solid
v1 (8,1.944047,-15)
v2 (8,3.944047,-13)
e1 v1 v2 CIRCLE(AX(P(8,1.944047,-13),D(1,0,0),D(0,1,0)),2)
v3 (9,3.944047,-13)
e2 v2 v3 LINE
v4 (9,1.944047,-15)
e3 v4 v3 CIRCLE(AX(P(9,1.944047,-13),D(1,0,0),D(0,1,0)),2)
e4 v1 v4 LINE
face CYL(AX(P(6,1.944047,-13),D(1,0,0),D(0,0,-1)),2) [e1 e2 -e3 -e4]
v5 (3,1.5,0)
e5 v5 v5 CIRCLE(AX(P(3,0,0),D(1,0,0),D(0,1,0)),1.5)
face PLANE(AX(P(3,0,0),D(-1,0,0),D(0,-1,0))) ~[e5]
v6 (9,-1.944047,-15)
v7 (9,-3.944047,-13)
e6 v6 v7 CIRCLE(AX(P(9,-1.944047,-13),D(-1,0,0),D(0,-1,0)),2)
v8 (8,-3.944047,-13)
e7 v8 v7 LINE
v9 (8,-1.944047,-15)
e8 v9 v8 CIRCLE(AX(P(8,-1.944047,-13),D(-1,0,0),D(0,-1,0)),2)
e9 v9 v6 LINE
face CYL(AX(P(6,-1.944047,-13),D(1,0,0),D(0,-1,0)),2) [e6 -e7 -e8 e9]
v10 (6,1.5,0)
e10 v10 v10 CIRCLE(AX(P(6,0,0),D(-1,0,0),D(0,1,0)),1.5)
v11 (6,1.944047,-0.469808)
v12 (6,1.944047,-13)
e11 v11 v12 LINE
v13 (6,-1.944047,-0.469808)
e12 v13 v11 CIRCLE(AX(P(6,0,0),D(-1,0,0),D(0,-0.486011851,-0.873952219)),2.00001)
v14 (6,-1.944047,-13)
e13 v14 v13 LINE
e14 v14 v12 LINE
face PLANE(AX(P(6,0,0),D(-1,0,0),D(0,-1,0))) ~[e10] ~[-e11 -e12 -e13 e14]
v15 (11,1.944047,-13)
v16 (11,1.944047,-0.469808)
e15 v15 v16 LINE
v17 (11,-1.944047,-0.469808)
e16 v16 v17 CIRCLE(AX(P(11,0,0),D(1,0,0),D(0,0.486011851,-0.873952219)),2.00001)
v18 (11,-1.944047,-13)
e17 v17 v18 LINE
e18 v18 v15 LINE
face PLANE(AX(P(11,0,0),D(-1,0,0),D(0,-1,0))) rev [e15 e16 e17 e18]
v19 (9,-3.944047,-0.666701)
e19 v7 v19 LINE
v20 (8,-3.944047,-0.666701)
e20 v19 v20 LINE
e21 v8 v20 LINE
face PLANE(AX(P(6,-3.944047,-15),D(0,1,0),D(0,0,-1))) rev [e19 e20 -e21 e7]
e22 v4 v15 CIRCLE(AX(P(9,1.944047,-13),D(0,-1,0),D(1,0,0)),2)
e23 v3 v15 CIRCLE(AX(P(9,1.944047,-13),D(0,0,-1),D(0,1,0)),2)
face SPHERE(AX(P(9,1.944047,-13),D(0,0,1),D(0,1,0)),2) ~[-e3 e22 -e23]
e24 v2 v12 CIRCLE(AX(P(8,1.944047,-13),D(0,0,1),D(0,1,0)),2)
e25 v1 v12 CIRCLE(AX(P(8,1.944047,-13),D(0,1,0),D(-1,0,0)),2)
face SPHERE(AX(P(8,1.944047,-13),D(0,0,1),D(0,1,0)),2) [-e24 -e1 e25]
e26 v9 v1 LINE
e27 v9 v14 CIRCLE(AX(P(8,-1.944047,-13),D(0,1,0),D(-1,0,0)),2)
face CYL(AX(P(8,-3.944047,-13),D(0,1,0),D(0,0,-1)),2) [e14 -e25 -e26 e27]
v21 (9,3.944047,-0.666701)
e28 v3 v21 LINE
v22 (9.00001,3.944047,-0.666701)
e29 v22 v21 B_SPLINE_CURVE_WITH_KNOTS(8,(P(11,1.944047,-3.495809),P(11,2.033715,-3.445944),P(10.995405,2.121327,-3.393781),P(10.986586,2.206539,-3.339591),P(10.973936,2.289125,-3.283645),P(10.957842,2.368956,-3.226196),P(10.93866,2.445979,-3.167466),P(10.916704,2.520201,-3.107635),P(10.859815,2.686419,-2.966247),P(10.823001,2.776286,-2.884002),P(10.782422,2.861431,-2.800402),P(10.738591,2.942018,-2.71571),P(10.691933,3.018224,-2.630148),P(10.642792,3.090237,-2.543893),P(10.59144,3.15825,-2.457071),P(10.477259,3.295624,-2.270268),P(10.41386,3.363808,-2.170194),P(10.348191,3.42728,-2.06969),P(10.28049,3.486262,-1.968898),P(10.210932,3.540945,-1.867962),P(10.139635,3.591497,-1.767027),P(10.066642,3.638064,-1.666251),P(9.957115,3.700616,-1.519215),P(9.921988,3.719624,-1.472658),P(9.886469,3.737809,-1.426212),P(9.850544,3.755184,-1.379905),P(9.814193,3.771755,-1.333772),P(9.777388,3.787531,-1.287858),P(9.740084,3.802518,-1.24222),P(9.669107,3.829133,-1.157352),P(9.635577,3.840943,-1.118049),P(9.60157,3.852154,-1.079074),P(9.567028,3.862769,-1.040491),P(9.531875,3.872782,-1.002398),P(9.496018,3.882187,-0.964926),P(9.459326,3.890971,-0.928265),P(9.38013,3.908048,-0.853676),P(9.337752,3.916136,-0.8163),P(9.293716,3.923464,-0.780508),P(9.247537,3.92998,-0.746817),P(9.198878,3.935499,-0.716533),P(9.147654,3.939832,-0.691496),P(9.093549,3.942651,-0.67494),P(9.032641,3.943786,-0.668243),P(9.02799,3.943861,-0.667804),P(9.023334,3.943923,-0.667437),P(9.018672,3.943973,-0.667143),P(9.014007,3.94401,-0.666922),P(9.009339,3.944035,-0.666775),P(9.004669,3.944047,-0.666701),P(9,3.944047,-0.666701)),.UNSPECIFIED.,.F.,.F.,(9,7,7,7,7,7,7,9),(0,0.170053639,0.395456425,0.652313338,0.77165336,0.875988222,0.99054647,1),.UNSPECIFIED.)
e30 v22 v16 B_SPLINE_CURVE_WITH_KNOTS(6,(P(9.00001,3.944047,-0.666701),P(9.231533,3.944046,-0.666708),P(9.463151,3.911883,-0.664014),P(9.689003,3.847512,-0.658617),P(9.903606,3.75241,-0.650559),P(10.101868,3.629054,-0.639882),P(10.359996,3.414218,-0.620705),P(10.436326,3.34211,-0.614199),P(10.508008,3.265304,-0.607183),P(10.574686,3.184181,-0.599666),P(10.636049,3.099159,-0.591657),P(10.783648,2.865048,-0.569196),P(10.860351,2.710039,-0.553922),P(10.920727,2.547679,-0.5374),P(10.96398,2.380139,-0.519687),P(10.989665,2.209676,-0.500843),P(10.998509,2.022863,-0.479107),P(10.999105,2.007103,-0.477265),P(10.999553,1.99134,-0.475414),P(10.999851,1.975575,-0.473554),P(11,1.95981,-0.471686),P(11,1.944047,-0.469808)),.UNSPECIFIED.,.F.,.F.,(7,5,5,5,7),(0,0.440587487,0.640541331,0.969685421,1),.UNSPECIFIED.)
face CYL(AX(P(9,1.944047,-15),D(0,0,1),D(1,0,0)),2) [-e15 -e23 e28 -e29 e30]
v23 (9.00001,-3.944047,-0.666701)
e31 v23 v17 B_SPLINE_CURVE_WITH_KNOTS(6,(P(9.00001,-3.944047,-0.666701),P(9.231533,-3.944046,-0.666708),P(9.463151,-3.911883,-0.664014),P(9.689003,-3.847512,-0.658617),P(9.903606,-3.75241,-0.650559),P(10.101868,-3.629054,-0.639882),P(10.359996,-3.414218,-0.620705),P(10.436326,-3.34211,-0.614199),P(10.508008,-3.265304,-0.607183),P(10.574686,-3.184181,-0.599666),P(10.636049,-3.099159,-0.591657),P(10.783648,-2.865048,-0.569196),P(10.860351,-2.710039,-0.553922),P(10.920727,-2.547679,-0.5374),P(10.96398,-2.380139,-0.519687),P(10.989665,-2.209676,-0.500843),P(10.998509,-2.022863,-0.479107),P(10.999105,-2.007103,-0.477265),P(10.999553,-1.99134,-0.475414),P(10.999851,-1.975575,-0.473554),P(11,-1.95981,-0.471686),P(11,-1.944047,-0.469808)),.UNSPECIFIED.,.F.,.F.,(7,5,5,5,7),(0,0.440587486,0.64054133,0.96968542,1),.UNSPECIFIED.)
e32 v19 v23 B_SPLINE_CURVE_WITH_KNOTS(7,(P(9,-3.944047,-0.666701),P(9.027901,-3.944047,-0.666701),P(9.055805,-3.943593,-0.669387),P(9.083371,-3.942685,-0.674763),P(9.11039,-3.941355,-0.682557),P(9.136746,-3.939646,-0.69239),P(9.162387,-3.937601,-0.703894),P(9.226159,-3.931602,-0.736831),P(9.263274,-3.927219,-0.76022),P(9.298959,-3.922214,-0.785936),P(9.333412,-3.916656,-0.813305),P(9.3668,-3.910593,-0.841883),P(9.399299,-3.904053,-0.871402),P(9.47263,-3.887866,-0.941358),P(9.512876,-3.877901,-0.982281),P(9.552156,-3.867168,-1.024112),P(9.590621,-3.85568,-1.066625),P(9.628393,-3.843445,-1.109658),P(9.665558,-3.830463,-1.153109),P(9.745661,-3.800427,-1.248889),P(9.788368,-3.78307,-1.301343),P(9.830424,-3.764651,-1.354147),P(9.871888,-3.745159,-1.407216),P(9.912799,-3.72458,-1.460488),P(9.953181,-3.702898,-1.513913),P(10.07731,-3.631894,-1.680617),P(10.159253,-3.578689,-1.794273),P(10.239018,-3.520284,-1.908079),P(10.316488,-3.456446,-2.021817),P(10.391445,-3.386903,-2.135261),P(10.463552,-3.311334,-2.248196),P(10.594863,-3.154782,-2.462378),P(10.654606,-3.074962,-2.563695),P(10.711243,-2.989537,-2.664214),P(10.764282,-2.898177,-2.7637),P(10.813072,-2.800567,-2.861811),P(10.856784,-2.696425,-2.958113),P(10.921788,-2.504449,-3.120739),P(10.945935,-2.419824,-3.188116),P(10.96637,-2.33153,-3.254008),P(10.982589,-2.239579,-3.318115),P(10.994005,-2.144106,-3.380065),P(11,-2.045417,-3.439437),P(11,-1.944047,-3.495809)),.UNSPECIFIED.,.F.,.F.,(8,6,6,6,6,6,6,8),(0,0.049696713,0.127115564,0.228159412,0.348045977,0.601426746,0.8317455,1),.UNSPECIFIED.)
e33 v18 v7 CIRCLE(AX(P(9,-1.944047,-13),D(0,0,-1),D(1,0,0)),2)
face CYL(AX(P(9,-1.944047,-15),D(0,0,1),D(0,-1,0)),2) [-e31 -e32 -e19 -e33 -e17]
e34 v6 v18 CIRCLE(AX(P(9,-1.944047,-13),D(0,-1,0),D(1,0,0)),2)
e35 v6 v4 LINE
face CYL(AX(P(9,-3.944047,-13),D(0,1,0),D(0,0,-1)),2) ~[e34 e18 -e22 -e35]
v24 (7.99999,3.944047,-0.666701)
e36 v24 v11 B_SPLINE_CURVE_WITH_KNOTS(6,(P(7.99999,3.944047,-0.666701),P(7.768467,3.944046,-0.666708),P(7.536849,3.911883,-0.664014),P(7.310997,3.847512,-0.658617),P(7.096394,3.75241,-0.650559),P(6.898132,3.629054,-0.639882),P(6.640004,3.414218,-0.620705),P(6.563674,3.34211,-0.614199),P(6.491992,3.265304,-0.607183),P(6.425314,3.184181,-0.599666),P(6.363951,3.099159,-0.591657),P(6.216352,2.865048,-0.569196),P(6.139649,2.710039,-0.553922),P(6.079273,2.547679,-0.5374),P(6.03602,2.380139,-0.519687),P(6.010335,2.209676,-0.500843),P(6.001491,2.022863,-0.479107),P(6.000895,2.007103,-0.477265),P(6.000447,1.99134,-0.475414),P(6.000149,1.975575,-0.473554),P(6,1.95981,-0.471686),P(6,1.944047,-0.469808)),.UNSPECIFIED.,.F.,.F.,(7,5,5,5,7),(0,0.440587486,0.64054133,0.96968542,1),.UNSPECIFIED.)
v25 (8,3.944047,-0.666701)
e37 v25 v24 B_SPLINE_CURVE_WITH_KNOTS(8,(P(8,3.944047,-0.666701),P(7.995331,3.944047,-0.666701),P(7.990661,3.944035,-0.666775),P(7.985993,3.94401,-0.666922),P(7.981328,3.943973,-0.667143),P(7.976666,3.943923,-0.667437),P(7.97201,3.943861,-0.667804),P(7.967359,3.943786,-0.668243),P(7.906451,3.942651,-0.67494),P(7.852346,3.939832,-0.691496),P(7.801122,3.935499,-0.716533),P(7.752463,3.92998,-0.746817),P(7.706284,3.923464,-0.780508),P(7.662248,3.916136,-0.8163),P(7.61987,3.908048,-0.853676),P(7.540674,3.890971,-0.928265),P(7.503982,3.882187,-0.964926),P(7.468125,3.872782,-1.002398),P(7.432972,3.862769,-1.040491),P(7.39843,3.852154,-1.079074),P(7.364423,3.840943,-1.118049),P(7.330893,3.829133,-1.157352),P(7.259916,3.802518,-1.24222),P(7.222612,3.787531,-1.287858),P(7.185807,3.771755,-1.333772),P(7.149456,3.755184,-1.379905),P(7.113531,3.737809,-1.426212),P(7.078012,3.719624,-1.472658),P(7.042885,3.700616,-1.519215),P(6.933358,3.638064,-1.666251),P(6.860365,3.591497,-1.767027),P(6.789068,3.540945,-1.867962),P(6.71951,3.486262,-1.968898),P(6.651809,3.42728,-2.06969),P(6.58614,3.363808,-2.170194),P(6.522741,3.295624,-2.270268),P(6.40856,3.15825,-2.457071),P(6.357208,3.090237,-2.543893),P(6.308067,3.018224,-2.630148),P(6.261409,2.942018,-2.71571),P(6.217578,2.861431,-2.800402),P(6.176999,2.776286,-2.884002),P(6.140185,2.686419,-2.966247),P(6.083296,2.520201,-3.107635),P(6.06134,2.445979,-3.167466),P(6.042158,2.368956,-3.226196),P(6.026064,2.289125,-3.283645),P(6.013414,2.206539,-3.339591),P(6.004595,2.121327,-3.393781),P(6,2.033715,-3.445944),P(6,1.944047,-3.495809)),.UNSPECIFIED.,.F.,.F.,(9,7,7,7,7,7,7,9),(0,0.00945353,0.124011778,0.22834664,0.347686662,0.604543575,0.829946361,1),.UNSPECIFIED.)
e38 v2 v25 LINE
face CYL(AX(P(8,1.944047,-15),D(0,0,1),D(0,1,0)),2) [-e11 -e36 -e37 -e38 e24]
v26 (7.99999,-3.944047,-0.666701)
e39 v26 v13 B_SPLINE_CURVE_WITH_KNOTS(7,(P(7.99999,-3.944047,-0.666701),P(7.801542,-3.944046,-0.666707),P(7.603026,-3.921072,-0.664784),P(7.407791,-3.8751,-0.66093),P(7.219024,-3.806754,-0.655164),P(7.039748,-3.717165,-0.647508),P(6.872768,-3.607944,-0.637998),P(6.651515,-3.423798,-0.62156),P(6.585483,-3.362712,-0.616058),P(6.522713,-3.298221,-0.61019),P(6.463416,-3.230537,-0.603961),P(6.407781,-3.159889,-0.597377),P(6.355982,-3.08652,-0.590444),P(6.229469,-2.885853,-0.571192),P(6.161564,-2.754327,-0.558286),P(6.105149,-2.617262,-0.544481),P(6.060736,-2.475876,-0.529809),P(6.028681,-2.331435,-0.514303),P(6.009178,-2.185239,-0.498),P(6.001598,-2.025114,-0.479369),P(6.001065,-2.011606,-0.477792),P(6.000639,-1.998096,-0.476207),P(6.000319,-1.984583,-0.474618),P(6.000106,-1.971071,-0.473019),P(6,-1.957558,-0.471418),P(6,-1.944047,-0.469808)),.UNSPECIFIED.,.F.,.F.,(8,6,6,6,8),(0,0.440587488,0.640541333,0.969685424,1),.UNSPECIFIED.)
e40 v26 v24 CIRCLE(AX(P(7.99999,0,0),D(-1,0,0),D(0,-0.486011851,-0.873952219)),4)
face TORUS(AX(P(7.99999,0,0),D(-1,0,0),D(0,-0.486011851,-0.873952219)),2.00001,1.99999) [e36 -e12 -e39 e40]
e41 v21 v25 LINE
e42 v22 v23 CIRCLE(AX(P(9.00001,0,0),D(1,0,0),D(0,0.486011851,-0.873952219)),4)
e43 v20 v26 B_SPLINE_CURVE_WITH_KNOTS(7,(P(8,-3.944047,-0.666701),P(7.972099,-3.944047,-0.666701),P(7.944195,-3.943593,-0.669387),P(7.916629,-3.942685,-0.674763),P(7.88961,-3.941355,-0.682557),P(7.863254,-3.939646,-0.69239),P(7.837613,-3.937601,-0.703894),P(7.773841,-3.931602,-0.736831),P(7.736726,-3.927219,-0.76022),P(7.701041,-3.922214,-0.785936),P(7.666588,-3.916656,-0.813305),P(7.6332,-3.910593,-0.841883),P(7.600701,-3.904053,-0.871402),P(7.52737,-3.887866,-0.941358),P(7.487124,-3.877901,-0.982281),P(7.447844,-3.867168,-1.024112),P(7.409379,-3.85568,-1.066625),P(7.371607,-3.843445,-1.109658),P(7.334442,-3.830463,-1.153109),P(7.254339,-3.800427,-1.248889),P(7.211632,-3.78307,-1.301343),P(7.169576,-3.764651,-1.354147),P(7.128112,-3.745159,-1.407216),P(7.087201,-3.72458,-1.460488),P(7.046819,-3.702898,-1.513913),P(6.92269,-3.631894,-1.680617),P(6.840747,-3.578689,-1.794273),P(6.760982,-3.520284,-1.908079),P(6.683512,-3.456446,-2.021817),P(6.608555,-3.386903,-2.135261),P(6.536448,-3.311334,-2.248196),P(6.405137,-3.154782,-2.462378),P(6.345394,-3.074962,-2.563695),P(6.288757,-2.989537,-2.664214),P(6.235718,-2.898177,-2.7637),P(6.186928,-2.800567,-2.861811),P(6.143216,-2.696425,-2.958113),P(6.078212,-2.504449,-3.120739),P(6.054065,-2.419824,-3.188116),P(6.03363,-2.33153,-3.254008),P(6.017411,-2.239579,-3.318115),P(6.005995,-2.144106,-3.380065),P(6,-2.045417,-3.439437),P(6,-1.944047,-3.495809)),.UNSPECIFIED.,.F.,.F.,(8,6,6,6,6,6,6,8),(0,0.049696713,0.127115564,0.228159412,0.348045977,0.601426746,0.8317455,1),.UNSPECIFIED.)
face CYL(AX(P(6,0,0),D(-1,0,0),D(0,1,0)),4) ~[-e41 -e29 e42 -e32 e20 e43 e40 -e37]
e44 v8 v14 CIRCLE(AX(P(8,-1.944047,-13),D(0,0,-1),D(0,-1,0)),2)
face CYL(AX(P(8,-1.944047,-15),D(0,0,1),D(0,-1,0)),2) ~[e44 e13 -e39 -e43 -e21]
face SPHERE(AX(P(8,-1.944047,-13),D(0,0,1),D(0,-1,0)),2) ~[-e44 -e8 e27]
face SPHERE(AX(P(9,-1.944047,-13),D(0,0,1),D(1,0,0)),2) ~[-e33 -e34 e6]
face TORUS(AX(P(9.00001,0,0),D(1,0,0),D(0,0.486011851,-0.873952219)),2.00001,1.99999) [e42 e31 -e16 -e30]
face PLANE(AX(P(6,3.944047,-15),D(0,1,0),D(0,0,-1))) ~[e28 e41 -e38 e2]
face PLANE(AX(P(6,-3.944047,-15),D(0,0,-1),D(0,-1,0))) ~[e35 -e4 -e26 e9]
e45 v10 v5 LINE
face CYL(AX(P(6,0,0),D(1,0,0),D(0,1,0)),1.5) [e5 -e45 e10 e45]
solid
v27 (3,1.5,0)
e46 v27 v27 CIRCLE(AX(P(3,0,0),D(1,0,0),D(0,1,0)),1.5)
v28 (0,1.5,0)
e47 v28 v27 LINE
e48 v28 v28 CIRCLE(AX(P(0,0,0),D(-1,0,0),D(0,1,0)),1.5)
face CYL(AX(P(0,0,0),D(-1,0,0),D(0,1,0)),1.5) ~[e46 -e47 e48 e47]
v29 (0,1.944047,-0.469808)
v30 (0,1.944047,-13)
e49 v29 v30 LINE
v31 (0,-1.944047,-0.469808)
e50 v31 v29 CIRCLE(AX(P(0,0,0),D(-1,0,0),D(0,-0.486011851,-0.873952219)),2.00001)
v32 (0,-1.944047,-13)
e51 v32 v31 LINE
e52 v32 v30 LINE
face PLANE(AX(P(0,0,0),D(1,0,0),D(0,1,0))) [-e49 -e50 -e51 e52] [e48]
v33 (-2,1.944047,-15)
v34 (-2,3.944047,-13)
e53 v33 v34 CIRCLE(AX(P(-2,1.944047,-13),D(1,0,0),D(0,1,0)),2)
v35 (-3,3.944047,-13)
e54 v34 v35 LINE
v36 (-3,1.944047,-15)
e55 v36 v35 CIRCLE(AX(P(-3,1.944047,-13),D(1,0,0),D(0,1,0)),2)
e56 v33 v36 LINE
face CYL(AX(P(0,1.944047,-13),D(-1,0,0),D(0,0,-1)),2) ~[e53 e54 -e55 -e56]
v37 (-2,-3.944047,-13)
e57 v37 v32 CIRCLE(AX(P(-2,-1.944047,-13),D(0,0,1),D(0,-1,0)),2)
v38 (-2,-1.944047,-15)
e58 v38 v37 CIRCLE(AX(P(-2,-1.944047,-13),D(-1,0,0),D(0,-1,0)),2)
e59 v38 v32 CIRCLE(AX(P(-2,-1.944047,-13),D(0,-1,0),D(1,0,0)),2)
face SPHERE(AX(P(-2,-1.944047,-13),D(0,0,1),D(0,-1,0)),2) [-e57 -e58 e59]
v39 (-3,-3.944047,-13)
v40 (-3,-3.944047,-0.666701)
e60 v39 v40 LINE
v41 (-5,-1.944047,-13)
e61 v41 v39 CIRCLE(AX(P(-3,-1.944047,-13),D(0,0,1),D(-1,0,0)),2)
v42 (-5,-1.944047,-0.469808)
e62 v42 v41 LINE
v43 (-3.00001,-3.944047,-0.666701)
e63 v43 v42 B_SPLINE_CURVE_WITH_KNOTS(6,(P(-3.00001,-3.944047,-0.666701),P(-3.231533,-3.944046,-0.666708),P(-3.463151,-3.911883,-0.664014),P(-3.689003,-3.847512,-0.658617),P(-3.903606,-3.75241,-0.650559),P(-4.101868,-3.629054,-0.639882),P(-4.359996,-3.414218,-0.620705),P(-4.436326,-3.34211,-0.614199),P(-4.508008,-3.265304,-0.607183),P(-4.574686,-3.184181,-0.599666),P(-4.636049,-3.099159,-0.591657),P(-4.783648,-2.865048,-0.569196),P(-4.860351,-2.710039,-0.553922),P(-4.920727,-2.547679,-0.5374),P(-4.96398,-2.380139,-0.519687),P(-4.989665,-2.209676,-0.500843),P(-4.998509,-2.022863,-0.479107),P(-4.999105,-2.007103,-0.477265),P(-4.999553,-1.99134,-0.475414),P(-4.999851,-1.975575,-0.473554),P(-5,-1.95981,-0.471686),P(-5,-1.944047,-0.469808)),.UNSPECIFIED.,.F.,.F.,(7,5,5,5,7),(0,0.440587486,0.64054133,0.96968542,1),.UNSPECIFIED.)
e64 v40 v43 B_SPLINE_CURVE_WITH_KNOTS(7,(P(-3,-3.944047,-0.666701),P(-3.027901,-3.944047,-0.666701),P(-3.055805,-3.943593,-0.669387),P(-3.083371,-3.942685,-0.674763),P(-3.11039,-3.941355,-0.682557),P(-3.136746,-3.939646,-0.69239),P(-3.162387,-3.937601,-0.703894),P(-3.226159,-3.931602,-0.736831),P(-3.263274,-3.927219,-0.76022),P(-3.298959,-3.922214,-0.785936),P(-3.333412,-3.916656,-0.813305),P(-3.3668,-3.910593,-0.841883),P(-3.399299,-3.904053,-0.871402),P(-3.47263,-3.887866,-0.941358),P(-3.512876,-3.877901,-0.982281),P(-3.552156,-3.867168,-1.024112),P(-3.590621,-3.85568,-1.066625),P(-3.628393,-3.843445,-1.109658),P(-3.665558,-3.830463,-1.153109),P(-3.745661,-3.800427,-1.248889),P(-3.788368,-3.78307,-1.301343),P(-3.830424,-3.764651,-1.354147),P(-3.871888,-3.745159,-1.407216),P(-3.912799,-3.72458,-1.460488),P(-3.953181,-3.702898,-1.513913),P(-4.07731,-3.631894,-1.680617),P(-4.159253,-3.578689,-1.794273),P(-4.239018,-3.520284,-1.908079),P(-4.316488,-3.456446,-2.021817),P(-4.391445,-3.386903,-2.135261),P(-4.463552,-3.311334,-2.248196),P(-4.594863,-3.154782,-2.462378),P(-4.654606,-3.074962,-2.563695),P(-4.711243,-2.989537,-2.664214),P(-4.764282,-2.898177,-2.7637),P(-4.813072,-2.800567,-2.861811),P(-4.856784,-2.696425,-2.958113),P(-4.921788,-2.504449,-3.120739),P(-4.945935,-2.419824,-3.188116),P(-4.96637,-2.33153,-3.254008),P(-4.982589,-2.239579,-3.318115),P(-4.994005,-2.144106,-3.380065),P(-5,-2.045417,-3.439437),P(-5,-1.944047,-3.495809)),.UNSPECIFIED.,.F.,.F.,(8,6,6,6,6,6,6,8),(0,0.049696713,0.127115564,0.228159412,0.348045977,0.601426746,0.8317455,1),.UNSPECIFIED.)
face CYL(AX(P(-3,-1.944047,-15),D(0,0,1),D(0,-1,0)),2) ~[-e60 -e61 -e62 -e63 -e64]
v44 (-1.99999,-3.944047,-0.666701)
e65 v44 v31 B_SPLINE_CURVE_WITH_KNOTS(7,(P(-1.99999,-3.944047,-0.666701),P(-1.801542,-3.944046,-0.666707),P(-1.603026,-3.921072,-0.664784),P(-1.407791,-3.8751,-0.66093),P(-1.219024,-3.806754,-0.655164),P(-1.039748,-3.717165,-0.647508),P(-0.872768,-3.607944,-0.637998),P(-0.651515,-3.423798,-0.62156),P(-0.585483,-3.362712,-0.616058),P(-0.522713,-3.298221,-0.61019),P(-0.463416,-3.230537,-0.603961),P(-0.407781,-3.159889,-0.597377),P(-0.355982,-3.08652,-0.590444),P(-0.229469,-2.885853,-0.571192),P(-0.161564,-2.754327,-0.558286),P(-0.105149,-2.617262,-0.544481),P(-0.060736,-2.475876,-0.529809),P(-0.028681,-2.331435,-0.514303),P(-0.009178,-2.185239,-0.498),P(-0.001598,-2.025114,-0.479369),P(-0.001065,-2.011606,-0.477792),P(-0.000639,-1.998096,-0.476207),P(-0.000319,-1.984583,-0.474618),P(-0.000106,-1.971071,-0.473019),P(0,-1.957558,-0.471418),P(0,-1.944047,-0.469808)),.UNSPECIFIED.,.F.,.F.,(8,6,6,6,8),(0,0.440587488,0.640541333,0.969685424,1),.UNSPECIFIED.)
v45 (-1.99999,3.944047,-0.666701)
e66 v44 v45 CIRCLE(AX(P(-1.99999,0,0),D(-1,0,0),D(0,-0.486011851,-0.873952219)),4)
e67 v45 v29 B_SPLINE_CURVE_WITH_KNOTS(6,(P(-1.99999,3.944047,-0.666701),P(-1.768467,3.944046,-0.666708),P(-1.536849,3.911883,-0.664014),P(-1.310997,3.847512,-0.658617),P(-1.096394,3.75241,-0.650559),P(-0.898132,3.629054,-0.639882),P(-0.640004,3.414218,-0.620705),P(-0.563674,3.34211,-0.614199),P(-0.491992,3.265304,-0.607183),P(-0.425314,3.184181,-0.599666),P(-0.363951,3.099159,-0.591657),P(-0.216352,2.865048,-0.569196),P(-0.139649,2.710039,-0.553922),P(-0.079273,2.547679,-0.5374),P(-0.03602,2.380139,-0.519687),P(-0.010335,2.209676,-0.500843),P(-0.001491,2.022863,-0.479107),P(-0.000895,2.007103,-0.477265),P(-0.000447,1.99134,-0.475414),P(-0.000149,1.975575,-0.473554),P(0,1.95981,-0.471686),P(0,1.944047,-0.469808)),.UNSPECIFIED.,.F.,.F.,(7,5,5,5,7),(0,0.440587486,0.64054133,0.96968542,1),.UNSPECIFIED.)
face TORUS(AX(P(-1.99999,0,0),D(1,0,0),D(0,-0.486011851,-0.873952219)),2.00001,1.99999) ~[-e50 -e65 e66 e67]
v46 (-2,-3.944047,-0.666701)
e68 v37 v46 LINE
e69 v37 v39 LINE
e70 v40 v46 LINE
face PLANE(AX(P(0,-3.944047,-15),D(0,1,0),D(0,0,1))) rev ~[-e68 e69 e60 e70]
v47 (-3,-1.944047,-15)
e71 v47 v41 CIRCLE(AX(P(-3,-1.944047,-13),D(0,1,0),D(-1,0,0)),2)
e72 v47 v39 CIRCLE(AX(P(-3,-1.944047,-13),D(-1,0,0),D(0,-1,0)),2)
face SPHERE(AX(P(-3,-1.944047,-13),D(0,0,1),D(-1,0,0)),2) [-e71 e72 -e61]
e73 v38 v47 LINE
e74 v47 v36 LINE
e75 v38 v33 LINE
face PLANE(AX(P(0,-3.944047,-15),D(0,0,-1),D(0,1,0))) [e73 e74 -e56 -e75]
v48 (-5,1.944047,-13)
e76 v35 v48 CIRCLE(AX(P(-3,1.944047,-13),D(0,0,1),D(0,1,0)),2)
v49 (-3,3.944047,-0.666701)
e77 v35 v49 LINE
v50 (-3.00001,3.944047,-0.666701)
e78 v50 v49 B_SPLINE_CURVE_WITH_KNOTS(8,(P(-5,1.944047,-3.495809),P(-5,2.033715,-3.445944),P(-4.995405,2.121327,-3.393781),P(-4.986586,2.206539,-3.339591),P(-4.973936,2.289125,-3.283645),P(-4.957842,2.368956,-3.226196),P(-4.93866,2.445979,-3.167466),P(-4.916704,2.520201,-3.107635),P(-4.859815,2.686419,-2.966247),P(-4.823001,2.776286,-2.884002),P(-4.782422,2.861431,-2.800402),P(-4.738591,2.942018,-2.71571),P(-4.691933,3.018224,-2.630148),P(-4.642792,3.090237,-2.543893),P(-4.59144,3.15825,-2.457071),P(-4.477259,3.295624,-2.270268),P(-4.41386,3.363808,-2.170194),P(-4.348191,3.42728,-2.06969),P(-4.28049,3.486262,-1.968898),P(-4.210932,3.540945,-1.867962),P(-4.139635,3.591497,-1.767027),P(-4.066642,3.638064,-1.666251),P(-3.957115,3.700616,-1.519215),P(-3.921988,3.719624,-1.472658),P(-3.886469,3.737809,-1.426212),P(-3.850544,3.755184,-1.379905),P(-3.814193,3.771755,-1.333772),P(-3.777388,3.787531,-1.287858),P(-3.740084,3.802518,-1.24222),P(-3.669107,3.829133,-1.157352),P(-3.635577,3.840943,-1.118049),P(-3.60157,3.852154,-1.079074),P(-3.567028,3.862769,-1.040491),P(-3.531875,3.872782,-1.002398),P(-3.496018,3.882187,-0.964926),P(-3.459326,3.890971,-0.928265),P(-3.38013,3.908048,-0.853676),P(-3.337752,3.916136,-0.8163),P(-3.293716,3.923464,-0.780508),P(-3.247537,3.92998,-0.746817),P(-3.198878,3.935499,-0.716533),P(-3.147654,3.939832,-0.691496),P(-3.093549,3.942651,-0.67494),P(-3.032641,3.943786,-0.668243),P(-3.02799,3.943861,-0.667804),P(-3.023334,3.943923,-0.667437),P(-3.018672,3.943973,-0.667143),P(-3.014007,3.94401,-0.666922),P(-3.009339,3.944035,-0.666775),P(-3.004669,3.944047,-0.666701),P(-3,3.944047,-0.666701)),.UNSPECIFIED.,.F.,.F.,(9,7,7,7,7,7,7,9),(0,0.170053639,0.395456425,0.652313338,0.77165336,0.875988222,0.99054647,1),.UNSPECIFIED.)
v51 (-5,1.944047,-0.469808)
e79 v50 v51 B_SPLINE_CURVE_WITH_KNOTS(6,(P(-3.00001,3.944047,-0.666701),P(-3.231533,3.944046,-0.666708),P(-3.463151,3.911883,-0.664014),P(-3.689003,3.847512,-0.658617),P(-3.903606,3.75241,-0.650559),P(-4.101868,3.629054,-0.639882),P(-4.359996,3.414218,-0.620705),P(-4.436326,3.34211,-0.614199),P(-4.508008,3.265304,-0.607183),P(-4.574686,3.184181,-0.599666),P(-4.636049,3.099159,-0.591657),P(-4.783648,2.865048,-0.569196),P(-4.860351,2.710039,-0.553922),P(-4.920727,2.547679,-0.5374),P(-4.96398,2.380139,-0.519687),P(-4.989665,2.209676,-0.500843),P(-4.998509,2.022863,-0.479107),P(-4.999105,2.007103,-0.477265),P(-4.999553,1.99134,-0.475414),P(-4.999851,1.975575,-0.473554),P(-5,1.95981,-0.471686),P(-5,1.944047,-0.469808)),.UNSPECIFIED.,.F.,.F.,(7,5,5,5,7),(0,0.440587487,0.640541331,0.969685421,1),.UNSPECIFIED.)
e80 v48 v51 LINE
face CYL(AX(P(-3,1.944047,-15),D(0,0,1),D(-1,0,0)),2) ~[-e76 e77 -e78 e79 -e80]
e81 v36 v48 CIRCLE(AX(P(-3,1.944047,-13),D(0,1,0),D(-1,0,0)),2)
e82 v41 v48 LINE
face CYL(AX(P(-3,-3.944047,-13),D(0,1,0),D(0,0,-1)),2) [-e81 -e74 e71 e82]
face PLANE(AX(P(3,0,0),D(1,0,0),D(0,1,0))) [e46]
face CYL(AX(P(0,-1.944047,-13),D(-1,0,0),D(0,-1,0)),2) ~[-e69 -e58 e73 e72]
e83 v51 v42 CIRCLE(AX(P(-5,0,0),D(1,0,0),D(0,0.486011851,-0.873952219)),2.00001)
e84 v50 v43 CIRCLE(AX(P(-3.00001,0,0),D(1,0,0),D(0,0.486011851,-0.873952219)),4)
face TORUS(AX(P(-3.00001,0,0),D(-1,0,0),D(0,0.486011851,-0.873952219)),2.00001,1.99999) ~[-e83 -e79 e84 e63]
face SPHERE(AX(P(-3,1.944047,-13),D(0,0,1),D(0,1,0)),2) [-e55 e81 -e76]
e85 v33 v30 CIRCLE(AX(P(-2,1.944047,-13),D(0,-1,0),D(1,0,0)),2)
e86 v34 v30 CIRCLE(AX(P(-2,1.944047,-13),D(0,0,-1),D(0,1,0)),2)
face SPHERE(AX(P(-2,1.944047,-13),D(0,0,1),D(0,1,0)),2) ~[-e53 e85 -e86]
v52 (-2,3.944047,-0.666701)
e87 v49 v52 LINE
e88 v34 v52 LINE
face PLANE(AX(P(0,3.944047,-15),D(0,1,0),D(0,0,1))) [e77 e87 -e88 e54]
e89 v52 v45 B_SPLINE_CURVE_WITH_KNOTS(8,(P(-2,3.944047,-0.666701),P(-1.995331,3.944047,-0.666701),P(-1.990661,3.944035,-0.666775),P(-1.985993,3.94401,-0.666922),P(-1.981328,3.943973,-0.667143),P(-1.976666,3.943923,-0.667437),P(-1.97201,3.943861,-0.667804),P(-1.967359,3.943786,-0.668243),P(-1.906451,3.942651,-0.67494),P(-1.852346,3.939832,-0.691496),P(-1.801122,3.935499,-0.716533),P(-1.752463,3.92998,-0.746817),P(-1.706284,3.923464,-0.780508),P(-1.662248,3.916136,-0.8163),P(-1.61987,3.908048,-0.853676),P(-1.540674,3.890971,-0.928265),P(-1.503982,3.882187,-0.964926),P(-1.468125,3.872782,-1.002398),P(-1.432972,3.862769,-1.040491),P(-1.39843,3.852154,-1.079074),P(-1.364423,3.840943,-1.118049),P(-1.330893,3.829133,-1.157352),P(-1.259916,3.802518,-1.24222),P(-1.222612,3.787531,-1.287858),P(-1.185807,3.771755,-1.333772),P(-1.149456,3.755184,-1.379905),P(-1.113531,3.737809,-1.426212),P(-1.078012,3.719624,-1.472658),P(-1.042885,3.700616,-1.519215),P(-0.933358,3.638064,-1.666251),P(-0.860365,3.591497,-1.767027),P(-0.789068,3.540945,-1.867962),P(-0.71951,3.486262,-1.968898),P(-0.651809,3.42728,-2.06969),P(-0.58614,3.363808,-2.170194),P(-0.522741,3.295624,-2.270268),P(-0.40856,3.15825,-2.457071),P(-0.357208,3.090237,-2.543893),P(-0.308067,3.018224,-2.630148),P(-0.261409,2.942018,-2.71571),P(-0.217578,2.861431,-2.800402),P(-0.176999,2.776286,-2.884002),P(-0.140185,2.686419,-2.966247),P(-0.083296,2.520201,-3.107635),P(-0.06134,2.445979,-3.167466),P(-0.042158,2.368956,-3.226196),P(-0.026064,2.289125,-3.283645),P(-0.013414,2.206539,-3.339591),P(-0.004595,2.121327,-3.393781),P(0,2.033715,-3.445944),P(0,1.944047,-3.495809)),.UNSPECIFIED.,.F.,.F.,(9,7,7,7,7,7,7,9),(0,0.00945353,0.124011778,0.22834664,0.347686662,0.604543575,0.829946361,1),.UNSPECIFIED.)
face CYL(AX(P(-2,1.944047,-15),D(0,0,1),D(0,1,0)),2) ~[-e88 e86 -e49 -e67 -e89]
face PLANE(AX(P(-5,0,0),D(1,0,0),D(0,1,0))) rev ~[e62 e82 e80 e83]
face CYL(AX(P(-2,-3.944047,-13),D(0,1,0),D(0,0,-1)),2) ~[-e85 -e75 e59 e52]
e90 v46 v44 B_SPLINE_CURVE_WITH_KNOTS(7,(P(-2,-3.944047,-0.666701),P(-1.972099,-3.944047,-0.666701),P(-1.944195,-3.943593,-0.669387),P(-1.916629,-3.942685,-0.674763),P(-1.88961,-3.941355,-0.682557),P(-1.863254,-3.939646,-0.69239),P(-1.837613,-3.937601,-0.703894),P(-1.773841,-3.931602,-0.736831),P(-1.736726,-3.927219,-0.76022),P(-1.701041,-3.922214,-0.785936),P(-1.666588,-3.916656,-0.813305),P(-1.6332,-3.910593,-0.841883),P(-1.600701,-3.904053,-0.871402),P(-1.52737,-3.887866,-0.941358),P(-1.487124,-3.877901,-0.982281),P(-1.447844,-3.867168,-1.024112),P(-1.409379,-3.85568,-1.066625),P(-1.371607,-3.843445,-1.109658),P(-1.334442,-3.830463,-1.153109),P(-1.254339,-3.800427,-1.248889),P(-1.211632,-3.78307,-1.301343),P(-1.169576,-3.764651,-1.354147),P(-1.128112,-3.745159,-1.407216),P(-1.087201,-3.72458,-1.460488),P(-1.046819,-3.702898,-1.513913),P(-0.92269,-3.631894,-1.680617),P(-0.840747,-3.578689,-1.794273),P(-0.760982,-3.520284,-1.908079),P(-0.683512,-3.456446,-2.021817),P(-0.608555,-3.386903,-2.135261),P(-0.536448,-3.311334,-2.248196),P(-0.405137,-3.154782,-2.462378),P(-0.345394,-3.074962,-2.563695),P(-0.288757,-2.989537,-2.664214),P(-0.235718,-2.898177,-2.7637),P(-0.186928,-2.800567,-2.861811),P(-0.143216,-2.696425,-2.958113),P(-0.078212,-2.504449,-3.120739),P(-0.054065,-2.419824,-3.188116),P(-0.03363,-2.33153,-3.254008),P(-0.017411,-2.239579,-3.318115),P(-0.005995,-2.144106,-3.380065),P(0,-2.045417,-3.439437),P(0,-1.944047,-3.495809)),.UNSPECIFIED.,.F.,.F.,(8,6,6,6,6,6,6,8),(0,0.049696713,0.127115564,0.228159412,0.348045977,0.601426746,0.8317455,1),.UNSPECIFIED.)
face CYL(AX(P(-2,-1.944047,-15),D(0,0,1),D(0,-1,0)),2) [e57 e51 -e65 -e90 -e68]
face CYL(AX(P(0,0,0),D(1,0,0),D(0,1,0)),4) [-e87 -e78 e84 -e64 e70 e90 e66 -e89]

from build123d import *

# Parameters (mm, degrees)
F0_R     = 1.5
F1_DEPTH = 3
F2_R     = 4
F3_W     = 7.888094809
F3_H     = 15
F4_DEPTH = 5
F5_R     = 2
F6_R     = 1.99999


# Not quite as in the source:
# - a fillet or chamfer is up to 0.001 mm smaller than in the source, because OpenCascade refuses the exact size


with BuildPart() as f1:
    # F0 (on Right) → F1 (new body)
    with BuildSketch(Plane.YZ):
        Circle(F0_R)
    extrude(amount=F1_DEPTH)

    # F2 (on Right) + F3 (on Right) → F4 (join)
    with BuildSketch(Plane.YZ):
        Circle(F2_R)
    with BuildSketch(Plane.YZ):
        with Locations((0, -7.5)):
            Rectangle(F3_W, F3_H)
    extrude(amount=-F4_DEPTH)

    # F5
    f5_edges = [f1.edges().sort_by_distance(p)[0] for p in [
        (-5, -3.944047, -7.83335),
        (0, -3.944047, -7.83335),
        (0, 3.944047, -7.83335),
        (-5, 3.944047, -7.83335),
        (-2.5, 3.944047, -15),
        (-5, 0, -15),
        (-2.5, -3.944047, -15),
        (0, 0, -15),
    ]]
    fillet(f5_edges, radius=F5_R)

    # F6 (radius 2 in the source; OpenCascade refuses exactly that, so slightly less here)
    f6_edges = [f1.edges().sort_by_distance(p)[0] for p in [
        (-5, 0, 4),
        (0, 0, 4),
    ]]
    fillet(f6_edges, radius=F6_R)


with BuildPart() as f7_1:
    # F7: instance of F1
    add(f1.part.mirror(Plane.YZ.offset(3)))


solid = Compound([f1.part, f7_1.part])
